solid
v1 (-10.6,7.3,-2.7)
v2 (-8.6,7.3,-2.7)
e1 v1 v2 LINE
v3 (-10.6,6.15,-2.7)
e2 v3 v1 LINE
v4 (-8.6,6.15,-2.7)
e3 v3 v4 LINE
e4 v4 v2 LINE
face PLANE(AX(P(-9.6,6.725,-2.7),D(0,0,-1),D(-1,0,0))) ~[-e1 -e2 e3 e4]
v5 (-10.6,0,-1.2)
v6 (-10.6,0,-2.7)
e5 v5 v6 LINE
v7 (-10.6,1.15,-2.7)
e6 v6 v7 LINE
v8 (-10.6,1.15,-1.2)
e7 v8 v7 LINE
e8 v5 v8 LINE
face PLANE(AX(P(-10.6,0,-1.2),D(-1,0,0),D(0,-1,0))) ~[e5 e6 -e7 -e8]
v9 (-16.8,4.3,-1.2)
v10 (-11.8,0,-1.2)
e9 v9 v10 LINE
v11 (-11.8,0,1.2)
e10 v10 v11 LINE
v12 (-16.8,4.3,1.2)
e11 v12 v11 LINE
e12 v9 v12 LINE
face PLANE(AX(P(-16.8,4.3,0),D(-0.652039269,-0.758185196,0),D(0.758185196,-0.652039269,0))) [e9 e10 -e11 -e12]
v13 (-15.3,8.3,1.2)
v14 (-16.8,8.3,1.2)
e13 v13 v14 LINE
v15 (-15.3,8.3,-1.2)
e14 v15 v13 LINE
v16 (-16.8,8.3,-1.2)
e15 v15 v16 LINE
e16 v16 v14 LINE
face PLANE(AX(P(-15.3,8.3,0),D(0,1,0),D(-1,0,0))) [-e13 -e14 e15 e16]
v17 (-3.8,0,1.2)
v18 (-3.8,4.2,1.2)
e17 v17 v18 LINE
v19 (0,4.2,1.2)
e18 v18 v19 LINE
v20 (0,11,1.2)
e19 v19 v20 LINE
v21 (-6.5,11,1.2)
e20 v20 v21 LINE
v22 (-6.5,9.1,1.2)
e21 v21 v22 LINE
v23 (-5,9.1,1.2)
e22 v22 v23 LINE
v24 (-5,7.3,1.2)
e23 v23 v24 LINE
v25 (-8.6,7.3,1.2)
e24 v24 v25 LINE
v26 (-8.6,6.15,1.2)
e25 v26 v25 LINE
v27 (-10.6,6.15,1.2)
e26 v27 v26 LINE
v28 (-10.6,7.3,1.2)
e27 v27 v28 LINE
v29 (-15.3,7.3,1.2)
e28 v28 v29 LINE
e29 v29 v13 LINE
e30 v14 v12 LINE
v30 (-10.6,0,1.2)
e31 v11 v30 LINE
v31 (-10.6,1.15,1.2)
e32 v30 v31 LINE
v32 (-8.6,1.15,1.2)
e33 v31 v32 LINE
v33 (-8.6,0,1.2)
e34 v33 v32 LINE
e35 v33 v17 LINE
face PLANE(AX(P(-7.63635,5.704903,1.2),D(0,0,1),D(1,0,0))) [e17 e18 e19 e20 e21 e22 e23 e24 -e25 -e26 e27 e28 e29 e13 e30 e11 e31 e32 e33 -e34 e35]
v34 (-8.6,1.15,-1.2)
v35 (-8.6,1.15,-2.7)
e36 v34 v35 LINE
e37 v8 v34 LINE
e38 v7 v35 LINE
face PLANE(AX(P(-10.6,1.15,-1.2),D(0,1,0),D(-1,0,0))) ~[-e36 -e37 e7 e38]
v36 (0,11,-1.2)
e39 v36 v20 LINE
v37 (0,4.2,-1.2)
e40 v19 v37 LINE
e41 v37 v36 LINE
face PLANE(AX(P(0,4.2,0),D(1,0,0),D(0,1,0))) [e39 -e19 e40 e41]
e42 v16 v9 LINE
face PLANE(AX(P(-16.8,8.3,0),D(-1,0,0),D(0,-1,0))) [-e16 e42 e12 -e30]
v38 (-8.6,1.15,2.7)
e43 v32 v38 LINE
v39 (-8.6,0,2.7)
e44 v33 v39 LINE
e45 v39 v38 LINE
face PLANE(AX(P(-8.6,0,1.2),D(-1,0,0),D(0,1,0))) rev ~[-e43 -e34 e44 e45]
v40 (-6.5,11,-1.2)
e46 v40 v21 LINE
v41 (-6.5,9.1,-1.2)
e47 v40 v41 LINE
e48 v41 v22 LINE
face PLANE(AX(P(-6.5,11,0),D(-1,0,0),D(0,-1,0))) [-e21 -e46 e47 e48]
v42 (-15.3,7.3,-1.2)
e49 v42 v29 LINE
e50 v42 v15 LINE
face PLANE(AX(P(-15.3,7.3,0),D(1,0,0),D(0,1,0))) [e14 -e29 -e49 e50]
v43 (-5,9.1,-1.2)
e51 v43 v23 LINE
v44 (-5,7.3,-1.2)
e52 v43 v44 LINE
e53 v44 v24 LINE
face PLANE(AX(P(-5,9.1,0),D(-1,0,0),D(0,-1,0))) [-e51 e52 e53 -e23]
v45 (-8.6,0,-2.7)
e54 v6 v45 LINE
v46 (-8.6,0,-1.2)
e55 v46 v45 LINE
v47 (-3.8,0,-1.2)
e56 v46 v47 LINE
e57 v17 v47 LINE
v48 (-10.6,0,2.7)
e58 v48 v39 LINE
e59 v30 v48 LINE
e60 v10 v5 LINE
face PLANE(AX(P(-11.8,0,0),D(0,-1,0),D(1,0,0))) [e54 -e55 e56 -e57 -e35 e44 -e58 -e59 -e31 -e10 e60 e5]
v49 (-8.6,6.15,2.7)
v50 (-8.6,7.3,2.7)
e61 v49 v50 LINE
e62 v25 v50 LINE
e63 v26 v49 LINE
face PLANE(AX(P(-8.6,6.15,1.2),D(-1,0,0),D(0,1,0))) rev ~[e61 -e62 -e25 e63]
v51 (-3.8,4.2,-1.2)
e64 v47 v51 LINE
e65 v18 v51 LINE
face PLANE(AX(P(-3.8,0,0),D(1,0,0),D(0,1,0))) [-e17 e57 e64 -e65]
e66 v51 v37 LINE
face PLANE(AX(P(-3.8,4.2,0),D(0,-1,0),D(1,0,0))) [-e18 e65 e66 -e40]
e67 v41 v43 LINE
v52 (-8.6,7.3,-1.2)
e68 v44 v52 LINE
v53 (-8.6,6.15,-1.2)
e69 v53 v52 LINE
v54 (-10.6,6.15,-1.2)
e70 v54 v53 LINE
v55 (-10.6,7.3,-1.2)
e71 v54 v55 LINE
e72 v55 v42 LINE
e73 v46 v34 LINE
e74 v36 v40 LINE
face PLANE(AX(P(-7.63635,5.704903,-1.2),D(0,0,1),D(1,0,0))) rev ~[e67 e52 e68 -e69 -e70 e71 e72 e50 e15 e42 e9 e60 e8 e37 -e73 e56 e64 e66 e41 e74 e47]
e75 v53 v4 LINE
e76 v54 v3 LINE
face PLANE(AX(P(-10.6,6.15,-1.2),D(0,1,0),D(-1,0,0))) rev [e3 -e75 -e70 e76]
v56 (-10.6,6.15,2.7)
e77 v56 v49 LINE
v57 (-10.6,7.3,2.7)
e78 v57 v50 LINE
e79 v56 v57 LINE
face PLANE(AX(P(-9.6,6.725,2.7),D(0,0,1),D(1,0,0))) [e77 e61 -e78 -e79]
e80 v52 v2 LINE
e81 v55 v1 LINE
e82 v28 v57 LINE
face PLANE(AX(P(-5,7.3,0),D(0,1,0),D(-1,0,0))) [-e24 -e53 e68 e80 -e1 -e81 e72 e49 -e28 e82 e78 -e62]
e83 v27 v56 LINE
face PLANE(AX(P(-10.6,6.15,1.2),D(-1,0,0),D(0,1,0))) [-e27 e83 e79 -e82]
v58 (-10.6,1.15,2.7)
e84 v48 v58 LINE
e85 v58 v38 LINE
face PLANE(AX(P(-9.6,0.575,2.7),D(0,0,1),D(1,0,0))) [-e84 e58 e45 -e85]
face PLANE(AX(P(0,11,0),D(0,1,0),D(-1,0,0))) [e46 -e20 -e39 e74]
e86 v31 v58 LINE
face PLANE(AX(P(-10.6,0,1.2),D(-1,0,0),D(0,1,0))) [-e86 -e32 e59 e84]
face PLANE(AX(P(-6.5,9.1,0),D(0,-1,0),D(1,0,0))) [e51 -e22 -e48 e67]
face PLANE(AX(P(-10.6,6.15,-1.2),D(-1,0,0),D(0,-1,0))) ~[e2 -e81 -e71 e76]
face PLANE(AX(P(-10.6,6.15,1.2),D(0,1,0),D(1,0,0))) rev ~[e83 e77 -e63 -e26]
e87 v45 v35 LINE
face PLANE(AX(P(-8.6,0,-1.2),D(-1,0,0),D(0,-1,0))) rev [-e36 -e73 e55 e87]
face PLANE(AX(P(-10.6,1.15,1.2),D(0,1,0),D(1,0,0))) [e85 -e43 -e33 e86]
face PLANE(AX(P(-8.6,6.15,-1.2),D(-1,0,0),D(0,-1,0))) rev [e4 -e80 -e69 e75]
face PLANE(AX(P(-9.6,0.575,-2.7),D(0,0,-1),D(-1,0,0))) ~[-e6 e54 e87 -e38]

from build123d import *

# Parameters (mm, degrees)
F1_DEPTH = 1.2
F2_W     = 2
F2_H     = 1.15
F3_DEPTH = 1.5


# Not quite as in the source:
# - a pattern or mirror of a feature is missing from the dataset's text; its kind, count and spacing are read off the source's solid


with BuildPart() as f1:
    # F0 (on Top) → F1 (new body, symmetric)
    with BuildSketch(Plane.XY):
        Polygon((0, 4.2), (0, 11), (-6.5, 11), (-6.5, 9.1), (-5, 9.1), (-5, 7.3), (-15.3, 7.3), (-15.3, 8.3), (-16.8, 8.3), (-16.8, 4.3), (-11.8, 0), (-3.8, 0), (-3.8, 4.2), align=None)
    extrude(amount=F1_DEPTH, both=True)

    # F2 (on face) → F3 (join)
    with BuildSketch(Plane.XY.offset(1.2)):
        with Locations((-9.6, 0.575)):
            Rectangle(F2_W, F2_H)
        with Locations((-9.6, 6.725)):
            Rectangle(F2_W, F2_H)
    f3 = extrude(amount=F3_DEPTH)

    # F3_copies: F3 across plane
    add(f3.mirror(Plane(origin=(0, 0, 0), x_dir=(-1, 0, 0), z_dir=(0, 0, -1))))


solid = f1.part
